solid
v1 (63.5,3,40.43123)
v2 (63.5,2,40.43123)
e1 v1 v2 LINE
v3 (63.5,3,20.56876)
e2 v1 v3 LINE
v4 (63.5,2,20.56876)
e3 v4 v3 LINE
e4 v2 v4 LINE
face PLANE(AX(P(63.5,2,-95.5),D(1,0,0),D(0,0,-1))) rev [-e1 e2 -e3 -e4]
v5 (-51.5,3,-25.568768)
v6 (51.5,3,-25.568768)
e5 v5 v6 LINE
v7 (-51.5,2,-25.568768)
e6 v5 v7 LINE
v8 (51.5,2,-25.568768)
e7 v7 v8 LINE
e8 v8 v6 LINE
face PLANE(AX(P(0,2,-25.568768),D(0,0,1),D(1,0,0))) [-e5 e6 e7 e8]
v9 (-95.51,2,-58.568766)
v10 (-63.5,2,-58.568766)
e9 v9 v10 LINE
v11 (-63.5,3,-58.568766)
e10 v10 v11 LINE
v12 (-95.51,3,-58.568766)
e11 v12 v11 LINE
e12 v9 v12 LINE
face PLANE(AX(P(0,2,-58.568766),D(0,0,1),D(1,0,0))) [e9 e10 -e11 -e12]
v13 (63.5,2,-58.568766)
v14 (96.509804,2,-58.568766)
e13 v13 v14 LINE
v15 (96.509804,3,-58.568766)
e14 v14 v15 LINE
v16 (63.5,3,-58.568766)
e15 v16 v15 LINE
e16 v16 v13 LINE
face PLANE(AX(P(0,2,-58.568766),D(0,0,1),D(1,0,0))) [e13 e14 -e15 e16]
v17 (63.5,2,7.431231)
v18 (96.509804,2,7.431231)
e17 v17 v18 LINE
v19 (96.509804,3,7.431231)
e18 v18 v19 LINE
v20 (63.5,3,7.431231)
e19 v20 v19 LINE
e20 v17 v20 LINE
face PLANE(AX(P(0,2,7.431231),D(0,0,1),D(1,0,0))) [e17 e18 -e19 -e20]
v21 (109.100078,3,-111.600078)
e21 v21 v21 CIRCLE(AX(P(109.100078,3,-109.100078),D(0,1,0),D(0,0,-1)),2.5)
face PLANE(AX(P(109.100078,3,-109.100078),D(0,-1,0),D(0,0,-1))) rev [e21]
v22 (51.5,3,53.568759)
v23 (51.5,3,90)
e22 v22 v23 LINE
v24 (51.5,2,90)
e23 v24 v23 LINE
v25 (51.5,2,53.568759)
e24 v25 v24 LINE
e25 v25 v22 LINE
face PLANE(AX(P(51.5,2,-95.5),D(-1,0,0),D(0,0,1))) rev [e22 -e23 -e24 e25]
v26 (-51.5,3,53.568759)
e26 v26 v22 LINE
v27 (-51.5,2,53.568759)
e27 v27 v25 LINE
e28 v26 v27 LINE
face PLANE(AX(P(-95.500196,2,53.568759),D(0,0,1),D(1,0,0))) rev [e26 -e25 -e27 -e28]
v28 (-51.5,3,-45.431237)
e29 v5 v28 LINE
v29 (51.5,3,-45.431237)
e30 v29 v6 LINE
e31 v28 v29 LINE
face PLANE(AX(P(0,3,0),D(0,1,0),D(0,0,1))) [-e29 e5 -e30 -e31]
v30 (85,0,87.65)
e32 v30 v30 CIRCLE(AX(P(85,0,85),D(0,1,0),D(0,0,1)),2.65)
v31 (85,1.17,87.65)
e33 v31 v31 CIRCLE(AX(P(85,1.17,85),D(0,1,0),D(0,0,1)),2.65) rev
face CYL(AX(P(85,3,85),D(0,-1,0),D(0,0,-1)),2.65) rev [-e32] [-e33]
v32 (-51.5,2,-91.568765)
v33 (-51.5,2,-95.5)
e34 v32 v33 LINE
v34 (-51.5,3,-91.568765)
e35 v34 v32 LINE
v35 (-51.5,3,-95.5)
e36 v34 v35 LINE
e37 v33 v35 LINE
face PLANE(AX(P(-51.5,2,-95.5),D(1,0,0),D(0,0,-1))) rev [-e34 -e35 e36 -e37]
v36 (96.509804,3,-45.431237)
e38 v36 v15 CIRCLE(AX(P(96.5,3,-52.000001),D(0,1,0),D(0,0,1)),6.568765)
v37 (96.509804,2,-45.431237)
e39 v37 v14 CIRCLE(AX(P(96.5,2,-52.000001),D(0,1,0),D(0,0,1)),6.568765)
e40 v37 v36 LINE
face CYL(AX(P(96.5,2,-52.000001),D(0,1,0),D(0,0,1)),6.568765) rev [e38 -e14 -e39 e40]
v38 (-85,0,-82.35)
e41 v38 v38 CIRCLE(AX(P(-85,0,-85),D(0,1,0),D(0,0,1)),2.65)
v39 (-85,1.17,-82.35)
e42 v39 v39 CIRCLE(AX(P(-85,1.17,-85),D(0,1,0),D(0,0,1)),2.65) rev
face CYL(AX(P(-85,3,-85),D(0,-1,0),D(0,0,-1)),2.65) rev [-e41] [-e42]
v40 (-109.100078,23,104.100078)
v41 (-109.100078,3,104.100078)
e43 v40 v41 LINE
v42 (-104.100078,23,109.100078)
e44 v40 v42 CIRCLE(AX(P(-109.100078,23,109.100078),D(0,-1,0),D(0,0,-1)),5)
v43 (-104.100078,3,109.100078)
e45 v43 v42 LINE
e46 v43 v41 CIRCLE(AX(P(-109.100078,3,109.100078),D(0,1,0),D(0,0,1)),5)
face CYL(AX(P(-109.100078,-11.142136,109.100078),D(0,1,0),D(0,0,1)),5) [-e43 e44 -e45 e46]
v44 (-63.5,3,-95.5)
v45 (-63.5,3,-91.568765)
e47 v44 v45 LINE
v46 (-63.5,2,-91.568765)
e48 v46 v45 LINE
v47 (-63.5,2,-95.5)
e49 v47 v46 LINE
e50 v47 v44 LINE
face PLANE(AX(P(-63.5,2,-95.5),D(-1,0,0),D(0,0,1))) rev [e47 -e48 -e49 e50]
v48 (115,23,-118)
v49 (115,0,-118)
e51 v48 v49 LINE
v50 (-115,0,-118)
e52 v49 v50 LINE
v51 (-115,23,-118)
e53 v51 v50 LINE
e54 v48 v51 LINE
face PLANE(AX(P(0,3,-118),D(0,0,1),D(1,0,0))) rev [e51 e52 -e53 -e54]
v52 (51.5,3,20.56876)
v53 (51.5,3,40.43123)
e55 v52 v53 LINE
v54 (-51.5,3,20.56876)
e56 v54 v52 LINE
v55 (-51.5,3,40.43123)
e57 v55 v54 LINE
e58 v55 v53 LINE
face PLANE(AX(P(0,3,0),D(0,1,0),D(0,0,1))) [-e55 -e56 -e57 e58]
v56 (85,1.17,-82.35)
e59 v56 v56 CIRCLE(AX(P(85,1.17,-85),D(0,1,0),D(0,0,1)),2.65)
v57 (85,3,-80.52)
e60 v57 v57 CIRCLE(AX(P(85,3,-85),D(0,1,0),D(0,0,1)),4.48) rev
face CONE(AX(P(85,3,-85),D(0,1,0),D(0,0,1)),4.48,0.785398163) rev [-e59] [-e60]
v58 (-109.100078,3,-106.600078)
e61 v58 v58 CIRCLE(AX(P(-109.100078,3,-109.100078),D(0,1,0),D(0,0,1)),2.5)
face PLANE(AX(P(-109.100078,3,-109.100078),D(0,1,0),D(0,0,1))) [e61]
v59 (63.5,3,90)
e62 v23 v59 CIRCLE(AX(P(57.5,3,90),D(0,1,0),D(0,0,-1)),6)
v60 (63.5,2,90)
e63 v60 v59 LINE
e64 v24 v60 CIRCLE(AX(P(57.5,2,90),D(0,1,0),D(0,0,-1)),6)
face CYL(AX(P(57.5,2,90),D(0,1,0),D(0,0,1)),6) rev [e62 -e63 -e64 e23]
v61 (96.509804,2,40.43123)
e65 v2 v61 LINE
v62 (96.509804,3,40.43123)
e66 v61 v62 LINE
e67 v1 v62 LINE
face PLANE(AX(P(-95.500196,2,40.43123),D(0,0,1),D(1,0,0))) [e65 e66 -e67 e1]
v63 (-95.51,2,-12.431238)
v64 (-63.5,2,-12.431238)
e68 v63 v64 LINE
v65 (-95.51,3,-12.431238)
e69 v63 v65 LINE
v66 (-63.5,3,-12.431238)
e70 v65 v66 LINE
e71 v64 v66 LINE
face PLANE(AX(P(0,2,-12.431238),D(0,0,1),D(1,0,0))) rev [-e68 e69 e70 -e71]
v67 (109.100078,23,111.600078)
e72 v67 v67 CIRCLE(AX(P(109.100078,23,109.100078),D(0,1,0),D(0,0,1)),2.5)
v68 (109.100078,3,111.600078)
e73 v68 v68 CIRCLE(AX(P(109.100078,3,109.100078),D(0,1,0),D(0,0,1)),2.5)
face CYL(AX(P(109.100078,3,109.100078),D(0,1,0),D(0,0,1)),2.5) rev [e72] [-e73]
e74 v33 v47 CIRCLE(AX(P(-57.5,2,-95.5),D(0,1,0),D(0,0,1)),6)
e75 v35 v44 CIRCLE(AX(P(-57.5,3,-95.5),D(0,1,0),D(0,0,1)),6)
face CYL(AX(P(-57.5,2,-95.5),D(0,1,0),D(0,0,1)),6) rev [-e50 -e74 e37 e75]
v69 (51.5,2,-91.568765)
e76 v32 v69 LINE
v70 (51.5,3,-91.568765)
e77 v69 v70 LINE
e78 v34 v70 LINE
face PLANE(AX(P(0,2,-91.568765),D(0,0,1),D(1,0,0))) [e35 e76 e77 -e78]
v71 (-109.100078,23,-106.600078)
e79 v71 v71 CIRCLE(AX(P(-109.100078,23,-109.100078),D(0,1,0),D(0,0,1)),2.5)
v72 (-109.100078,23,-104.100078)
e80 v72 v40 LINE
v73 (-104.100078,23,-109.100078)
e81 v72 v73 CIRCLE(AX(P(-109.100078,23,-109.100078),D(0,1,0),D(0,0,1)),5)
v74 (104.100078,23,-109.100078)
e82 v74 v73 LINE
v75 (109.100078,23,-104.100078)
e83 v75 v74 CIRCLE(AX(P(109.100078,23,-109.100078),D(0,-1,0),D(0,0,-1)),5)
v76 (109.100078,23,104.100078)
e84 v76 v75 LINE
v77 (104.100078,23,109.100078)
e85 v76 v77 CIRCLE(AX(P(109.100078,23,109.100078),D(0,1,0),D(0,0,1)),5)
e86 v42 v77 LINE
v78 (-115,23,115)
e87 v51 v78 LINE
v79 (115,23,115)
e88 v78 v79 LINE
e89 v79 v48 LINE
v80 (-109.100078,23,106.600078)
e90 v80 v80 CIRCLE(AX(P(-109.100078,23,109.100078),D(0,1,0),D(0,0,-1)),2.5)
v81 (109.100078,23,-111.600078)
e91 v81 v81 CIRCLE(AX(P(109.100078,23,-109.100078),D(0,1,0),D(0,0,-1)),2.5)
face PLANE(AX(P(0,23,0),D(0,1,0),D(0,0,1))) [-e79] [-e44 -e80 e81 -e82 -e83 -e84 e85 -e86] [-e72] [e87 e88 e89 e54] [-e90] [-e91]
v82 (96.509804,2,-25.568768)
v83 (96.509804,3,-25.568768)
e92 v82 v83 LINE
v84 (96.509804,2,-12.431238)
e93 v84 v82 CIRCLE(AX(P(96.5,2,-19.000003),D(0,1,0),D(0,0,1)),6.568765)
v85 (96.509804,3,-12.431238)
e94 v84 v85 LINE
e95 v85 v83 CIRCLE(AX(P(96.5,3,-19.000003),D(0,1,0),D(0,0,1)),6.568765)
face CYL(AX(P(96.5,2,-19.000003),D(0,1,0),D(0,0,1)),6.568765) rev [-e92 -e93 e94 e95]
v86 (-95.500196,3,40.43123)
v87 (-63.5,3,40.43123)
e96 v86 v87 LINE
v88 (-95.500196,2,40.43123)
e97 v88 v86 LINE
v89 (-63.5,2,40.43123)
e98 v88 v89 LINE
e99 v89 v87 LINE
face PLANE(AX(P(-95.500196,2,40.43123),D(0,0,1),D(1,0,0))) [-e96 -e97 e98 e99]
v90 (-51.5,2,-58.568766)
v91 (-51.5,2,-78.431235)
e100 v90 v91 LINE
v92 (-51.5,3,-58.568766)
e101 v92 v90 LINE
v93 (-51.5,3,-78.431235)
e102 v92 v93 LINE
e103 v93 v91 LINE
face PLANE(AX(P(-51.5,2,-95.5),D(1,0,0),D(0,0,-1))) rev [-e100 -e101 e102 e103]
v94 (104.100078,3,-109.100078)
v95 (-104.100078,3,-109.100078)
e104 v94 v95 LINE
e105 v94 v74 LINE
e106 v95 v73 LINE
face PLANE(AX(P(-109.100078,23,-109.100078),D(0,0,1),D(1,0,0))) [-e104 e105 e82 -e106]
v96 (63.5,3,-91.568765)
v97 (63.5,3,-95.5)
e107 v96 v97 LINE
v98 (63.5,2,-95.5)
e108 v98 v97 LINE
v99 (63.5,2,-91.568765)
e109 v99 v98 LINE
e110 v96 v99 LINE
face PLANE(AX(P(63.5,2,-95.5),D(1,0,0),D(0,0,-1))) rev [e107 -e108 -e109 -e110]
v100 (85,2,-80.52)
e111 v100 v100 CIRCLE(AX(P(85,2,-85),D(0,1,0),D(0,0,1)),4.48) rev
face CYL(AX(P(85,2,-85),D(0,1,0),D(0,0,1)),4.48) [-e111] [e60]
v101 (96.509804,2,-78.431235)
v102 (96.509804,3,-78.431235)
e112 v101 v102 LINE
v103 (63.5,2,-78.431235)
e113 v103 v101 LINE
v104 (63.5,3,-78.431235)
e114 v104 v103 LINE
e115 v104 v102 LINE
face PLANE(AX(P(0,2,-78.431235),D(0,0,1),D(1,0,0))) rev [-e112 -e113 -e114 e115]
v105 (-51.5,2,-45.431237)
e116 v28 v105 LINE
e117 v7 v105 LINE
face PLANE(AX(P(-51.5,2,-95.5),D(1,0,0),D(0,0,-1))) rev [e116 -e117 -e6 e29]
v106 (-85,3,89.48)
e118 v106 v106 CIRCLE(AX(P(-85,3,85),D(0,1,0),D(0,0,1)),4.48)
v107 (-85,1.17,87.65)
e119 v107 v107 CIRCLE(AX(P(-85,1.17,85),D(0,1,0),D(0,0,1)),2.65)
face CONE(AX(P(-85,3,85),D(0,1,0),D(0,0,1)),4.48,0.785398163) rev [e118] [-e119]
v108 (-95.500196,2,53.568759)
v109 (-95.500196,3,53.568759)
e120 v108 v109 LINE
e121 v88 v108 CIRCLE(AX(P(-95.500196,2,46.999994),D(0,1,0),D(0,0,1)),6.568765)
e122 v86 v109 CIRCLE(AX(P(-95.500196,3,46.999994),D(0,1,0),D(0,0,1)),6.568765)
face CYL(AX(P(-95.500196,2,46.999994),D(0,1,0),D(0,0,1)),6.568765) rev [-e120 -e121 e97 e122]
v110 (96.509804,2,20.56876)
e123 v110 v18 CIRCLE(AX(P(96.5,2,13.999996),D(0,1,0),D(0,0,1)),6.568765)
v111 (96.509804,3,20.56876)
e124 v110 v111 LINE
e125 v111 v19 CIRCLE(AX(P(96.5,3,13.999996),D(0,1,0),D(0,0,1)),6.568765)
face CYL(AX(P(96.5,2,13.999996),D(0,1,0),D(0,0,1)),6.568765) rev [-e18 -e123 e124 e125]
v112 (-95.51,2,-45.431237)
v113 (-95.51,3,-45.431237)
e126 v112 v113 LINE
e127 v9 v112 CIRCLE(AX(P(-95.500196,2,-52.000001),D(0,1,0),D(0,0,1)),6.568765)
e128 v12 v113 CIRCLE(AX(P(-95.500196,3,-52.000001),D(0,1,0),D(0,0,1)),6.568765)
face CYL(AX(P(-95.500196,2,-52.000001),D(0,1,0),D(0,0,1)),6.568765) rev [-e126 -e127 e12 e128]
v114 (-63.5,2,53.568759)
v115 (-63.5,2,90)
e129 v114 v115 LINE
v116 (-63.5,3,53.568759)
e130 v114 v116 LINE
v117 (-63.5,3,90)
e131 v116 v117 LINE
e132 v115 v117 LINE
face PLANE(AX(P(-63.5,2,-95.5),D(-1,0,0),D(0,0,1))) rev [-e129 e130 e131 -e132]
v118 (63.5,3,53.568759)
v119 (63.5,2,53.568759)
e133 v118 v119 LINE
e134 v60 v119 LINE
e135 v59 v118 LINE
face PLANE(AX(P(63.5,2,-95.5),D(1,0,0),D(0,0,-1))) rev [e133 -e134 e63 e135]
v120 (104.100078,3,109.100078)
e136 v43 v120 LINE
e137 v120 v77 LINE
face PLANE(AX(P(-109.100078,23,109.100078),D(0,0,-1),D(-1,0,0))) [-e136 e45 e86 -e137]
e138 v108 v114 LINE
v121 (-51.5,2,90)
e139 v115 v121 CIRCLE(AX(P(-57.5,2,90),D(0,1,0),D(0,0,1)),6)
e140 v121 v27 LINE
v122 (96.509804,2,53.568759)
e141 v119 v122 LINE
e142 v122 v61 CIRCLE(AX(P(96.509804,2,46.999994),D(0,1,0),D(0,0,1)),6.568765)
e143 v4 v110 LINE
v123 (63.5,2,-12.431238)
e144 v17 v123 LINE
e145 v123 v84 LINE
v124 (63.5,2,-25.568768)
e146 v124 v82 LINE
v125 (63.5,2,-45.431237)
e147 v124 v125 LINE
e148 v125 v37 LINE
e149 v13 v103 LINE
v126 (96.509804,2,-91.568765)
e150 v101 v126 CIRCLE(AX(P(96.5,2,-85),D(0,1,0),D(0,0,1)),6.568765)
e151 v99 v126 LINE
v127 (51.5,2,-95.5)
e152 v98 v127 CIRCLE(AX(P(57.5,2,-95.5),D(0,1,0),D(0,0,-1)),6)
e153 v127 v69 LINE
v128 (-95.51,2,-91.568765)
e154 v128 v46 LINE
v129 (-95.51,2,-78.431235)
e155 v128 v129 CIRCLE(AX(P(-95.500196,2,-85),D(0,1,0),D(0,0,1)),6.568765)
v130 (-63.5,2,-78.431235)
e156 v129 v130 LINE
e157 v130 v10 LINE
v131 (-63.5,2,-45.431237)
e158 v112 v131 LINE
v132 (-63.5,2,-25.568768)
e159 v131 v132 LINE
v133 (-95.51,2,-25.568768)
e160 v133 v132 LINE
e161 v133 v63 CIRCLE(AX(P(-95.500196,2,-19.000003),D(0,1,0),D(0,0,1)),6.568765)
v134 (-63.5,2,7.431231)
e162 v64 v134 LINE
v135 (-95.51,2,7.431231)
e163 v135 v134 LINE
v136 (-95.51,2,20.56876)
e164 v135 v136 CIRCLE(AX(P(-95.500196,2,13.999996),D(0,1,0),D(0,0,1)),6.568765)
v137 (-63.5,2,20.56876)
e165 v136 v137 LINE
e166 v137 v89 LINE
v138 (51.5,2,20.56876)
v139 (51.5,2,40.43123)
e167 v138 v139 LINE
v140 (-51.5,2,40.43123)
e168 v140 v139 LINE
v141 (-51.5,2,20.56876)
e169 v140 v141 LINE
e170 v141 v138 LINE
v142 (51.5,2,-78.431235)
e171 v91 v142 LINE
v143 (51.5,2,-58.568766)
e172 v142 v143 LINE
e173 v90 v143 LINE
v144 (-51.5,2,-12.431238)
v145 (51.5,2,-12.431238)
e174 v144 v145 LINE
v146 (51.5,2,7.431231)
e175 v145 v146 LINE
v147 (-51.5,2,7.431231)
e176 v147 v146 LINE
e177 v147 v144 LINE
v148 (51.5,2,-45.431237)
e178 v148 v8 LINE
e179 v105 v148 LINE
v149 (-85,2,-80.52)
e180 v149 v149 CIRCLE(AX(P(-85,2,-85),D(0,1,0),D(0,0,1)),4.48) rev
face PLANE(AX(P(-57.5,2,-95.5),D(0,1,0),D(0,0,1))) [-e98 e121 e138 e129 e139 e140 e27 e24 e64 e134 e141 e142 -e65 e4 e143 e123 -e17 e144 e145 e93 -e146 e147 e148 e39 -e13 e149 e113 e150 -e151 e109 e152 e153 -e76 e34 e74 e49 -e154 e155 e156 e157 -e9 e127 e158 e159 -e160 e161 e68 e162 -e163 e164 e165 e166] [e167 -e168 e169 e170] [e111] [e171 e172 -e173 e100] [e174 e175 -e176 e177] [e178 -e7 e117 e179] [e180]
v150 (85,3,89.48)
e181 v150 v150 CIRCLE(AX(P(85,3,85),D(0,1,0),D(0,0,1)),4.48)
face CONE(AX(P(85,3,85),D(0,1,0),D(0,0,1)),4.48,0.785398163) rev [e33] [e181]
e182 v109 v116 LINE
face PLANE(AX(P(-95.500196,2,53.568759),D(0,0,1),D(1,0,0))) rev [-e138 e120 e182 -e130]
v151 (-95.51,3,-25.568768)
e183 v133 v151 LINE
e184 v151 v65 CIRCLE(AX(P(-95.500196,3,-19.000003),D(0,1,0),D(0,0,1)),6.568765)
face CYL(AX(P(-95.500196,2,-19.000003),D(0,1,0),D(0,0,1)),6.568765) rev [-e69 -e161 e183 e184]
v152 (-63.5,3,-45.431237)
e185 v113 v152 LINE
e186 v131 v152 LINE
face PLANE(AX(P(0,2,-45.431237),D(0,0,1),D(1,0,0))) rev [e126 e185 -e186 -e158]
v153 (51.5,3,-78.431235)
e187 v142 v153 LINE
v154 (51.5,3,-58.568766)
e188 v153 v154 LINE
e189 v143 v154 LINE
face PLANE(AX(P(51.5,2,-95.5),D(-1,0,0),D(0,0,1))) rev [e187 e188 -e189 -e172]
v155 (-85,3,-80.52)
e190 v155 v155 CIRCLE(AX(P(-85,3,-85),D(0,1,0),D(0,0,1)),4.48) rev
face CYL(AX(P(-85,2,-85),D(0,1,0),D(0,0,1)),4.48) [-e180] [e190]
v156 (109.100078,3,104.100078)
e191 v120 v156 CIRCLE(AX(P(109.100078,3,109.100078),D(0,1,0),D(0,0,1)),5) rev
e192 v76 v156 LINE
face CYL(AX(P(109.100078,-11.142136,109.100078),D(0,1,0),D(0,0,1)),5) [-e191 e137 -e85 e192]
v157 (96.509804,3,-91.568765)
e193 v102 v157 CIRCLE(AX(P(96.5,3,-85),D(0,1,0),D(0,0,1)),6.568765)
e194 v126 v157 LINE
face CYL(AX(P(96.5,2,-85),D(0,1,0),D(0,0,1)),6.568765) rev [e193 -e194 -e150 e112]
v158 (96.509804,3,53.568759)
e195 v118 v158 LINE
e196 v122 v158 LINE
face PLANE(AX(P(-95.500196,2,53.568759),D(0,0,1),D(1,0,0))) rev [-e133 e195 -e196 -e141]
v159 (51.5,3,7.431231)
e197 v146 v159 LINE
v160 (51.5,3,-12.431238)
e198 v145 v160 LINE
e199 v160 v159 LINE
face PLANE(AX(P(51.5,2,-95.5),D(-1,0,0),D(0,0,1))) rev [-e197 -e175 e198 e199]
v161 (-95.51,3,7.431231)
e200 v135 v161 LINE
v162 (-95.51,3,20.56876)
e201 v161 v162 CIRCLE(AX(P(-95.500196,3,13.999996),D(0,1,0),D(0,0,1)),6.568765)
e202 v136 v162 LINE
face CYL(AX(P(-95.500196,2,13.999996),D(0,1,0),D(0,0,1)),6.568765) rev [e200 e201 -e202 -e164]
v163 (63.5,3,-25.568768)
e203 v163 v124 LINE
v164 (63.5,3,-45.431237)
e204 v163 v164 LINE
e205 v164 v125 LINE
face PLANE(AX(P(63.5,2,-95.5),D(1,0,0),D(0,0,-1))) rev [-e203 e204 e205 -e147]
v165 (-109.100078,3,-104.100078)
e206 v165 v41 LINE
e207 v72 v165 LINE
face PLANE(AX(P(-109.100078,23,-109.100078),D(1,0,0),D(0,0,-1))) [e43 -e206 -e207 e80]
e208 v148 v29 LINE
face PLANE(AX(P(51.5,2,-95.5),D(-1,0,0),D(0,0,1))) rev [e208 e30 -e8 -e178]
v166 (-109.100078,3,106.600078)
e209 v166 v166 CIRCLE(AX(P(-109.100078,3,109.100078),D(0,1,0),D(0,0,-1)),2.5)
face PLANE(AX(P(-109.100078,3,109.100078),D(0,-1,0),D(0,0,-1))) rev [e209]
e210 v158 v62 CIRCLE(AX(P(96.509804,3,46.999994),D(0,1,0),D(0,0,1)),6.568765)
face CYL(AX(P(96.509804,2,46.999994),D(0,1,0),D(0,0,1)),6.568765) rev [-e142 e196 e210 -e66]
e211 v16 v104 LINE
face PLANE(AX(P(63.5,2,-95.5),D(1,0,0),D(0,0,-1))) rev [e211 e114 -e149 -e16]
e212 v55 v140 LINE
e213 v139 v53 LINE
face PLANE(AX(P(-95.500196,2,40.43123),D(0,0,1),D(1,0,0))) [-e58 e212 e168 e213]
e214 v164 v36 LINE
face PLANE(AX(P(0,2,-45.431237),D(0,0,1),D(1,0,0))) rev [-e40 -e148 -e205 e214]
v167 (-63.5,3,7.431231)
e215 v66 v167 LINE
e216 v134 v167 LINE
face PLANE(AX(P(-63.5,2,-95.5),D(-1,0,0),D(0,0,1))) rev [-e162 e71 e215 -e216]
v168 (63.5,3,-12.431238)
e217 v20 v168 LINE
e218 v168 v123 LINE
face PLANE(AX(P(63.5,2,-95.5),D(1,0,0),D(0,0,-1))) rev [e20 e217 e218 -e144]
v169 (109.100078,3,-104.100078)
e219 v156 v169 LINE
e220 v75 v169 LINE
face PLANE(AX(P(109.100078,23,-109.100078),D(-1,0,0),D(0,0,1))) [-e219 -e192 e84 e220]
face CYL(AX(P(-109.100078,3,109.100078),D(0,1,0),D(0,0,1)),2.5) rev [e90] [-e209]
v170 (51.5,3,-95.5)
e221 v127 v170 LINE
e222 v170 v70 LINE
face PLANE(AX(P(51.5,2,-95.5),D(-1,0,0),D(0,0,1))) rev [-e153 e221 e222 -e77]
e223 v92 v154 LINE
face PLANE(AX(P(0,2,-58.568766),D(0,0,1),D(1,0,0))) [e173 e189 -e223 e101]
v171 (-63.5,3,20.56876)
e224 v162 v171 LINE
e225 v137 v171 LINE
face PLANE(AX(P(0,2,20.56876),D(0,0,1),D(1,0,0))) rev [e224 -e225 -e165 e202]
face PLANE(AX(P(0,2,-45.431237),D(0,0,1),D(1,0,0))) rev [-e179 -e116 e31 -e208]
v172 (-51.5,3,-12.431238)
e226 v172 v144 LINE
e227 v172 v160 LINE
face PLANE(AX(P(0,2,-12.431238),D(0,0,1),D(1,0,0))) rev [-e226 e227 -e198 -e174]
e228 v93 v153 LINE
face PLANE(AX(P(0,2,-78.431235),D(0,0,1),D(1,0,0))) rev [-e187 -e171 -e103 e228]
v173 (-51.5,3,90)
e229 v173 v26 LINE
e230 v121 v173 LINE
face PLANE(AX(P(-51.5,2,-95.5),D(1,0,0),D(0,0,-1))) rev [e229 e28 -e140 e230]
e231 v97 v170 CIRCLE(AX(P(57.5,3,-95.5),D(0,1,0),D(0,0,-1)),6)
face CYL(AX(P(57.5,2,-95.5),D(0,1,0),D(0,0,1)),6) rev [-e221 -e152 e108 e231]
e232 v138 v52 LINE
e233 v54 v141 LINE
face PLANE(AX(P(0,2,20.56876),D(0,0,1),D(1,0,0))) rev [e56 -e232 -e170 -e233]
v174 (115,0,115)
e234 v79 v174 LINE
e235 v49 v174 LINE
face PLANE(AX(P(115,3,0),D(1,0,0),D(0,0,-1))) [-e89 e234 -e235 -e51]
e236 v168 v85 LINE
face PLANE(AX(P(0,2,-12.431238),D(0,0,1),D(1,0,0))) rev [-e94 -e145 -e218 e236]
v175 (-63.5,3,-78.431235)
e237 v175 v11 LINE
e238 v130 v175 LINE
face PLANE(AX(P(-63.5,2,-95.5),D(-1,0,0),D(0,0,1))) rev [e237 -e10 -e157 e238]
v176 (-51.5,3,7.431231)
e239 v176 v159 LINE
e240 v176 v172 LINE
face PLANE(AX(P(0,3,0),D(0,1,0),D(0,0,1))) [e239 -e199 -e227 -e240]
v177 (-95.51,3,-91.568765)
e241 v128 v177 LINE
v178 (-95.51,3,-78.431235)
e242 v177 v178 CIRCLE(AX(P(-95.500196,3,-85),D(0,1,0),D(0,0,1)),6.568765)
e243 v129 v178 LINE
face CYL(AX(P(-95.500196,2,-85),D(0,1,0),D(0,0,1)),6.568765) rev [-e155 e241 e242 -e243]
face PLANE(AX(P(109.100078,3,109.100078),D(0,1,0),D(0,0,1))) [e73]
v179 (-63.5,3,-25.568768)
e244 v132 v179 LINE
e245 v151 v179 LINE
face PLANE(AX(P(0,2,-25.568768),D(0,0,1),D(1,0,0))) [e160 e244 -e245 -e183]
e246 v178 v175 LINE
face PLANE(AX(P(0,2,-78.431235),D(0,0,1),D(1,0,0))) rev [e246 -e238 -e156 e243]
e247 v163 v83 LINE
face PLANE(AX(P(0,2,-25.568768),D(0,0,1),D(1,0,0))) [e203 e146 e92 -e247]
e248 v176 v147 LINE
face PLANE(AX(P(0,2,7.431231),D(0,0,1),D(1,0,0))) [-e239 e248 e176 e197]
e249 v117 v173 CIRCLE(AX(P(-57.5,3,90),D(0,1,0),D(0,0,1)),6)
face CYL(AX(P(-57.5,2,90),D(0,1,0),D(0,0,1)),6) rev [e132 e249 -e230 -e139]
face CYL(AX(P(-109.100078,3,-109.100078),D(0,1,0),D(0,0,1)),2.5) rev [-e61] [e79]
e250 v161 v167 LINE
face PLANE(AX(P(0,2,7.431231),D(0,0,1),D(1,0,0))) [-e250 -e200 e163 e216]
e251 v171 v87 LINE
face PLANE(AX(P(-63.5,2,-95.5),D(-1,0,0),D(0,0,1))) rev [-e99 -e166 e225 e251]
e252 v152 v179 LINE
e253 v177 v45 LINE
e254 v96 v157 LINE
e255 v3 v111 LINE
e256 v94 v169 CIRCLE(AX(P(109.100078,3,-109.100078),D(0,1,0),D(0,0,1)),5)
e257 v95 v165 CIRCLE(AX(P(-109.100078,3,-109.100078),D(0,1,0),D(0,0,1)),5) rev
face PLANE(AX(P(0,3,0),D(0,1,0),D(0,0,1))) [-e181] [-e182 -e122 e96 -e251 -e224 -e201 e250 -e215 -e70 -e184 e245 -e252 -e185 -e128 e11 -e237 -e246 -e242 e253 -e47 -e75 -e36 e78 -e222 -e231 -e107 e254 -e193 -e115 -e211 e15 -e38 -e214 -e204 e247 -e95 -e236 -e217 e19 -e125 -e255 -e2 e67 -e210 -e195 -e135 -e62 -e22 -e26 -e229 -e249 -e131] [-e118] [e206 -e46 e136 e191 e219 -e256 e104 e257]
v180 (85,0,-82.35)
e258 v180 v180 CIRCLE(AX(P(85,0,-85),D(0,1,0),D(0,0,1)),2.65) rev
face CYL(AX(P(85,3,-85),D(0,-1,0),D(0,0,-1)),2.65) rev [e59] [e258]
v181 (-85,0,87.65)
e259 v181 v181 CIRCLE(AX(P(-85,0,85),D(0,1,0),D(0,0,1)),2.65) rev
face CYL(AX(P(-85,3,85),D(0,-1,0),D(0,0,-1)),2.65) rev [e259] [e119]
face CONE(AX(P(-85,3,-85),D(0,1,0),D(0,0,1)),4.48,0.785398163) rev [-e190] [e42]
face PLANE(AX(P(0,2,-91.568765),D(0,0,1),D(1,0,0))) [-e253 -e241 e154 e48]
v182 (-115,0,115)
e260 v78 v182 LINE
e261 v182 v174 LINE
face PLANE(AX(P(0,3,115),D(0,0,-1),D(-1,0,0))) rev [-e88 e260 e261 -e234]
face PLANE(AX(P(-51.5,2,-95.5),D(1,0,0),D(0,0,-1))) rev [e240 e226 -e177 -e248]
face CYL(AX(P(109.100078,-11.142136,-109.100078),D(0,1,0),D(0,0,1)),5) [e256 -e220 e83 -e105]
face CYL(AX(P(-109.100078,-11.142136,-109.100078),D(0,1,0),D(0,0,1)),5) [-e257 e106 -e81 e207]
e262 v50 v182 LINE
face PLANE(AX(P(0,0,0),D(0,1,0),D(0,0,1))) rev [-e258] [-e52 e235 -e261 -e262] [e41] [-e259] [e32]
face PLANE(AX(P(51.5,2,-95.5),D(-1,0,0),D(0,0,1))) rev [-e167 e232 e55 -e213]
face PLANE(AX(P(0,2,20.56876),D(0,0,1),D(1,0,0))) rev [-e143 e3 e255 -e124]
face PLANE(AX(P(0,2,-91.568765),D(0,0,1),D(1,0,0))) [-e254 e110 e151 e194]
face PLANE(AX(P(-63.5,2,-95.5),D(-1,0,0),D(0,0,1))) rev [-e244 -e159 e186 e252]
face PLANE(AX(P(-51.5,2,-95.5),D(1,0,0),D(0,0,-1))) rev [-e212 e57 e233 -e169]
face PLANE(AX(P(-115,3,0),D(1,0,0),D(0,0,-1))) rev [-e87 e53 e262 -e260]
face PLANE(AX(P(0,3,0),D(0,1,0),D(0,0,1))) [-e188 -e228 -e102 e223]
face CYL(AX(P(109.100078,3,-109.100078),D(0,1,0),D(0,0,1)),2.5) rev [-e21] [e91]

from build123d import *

# Parameters (mm, degrees)
CROQUIS1_W                                   = 230
CROQUIS1_H                                   = 233
CROQUIS1_R                                   = 2.65
SALIENTE_EXTRUIR1_DEPTH                      = 3
REFRENTADO_PARA_TORNILLO_TAP_N_CON_C_2_COUNT = 2
REFRENTADO_PARA_TORNILLO_TAP_N_CON_C_2_PITCH = 170
REFRENTADO_PARA_TORNILLO_TAP_N_CON_C_3_COUNT = 2
REFRENTADO_PARA_TORNILLO_TAP_N_CON_C_3_PITCH = 170
REFRENTADO_PARA_TORNILLO_TAP_N_CON_C_4_COUNT = 2
REFRENTADO_PARA_TORNILLO_TAP_N_CON_C_4_PITCH = 240.416305603
CROQUIS4_W                                   = 218.200156166
CROQUIS4_H                                   = 218.200156166
SALIENTE_EXTRUIR2_DEPTH                      = 20
CROQUIS5_R                                   = 5
SALIENTE_EXTRUIR3_DEPTH                      = 20
CROQUIS6_R                                   = 2.5
CORTAR_EXTRUIR1_DEPTH                        = 20
CORTAR_EXTRUIR2_DEPTH                        = 1
CORTAR_EXTRUIR3_START                        = -1
CORTAR_EXTRUIR3_OUTLINE_R                    = 4.48
CORTAR_EXTRUIR3_OUTLINE_W                    = 103
CORTAR_EXTRUIR3_OUTLINE_H                    = 13.137529202
CORTAR_EXTRUIR3_OUTLINE_H_2                  = 13.137529203
CORTAR_EXTRUIR3_DEPTH                        = 1


# Read off the part's stored shape, not the designer's step: Cortar-Extruir3
with BuildPart() as part:
    # Croquis1 → Saliente-Extruir1 (new body)
    with BuildSketch(Plane(origin=(0, 0, 0), x_dir=(1, 0, 0), z_dir=(0, 1, 0))):
        with Locations((0, 1.5)):
            Rectangle(CROQUIS1_W, CROQUIS1_H)
        with Locations(Location((-85, 85, 0), (0, 0, 270))):
            Circle(CROQUIS1_R, mode=Mode.SUBTRACT)
        with Locations(Location((-85, -85, 0), (0, 0, 270))):
            Circle(CROQUIS1_R, mode=Mode.SUBTRACT)
        with Locations(Location((85, -85, 0), (0, 0, 270))):
            Circle(CROQUIS1_R, mode=Mode.SUBTRACT)
        with Locations(Location((85, 85, 0), (0, 0, 270))):
            Circle(CROQUIS1_R, mode=Mode.SUBTRACT)
    extrude(amount=SALIENTE_EXTRUIR1_DEPTH)

    # Croquis3 → Refrentado para tornillo tapón con cabeza plana de clavija de M41 (revolve, cut)
    with BuildSketch(Plane(origin=(-85, 3, -85), x_dir=(0, 0, 1), z_dir=(1, 0, 0))):
        Polygon((0, 0), (0, 3), (2.25, 3), (2.25, 2.23), (4.48, 0), align=None)
    refrentado_para_tornillo_tap_n_con_cabez = revolve(axis=Axis((-85, 9.35, -85), (0, -1, 0)), mode=Mode.SUBTRACT)

    # Refrentado para tornillo tap_n con c 2: Refrentado para tornillo tapón con cabeza plana de clavija de M41 ×2
    with Locations(*[(i * REFRENTADO_PARA_TORNILLO_TAP_N_CON_C_2_PITCH, 0, 0) for i in range(1, REFRENTADO_PARA_TORNILLO_TAP_N_CON_C_2_COUNT)]):
        add(refrentado_para_tornillo_tap_n_con_cabez, mode=Mode.SUBTRACT)

    # Refrentado para tornillo tap_n con c 3: Refrentado para tornillo tapón con cabeza plana de clavija de M41 ×2
    with Locations(*[(0, 0, i * REFRENTADO_PARA_TORNILLO_TAP_N_CON_C_3_PITCH) for i in range(1, REFRENTADO_PARA_TORNILLO_TAP_N_CON_C_3_COUNT)]):
        add(refrentado_para_tornillo_tap_n_con_cabez, mode=Mode.SUBTRACT)

    # Refrentado para tornillo tap_n con c 4: Refrentado para tornillo tapón con cabeza plana de clavija de M41 ×2
    with Locations(*[Vector(0.7071067811865476, 0, 0.7071067811865475) * (i * REFRENTADO_PARA_TORNILLO_TAP_N_CON_C_4_PITCH) for i in range(1, REFRENTADO_PARA_TORNILLO_TAP_N_CON_C_4_COUNT)]):
        add(refrentado_para_tornillo_tap_n_con_cabez, mode=Mode.SUBTRACT)

    # Croquis4 → Saliente-Extruir2 (add)
    with BuildSketch(Plane(origin=(0, 3, 0), x_dir=(1, 0, 0), z_dir=(0, 1, 0))):
        Polygon((-115, 115), (-115, -115), (115, -115), (115, 115), (115, 118), (-115, 118), align=None)
        Rectangle(CROQUIS4_W, CROQUIS4_H, mode=Mode.SUBTRACT)
    extrude(amount=SALIENTE_EXTRUIR2_DEPTH)

    # Croquis5 → Saliente-Extruir3 (add)
    with BuildSketch(Plane(origin=(0, 23, 0), x_dir=(1, 0, 0), z_dir=(0, 1, 0))):
        with Locations((-109.100078083, 109.100078083)):
            Circle(CROQUIS5_R)
        with Locations((109.100078083, 109.100078083)):
            Circle(CROQUIS5_R)
        with Locations((109.100078083, -109.100078083)):
            Circle(CROQUIS5_R)
        with Locations((-109.100078083, -109.100078083)):
            Circle(CROQUIS5_R)
    extrude(amount=-SALIENTE_EXTRUIR3_DEPTH)

    # Croquis6 → Cortar-Extruir1 (cut)
    with BuildSketch(Plane(origin=(0, 23, 0), x_dir=(1, 0, 0), z_dir=(0, 1, 0))):
        with Locations(Location((-109.100078083, 109.100078083, 0), (0, 0, 270))):
            Circle(CROQUIS6_R)
        with Locations(Location((109.100078083, 109.100078083, 0), (0, 0, 90))):
            Circle(CROQUIS6_R)
        with Locations(Location((109.100078083, -109.100078083, 0), (0, 0, 270))):
            Circle(CROQUIS6_R)
        with Locations(Location((-109.100078083, -109.100078083, 0), (0, 0, 90))):
            Circle(CROQUIS6_R)
    extrude(amount=-CORTAR_EXTRUIR1_DEPTH, mode=Mode.SUBTRACT)

    # Croquis8 → Cortar-Extruir2 (cut)
    with BuildSketch(Plane(origin=(0, 3, 0), x_dir=(1, 0, 0), z_dir=(0, 1, 0))):
        with BuildLine():
            Line((-51.5, 95.5), (-51.5, -90))
            ThreePointArc((-51.5, -90), (-57.5, -96), (-63.5, -90))
            Line((-63.5, -90), (-63.5, 95.5))
            ThreePointArc((-63.5, 95.5), (-57.5, 101.5), (-51.5, 95.5))
        make_face()
        with BuildLine():
            Line((51.5, 95.5), (51.5, -90))
            ThreePointArc((51.5, -90), (57.5, -96), (63.5, -90))
            Line((63.5, -90), (63.5, 95.5))
            ThreePointArc((63.5, 95.5), (57.5, 101.5), (51.5, 95.5))
        make_face()
    extrude(amount=-CORTAR_EXTRUIR2_DEPTH, mode=Mode.SUBTRACT)

    # Cortar-Extruir3 outline → Cortar-Extruir3 (cut)
    # profile 1 of 15: a face of its own
    with BuildSketch(Plane(origin=(0, 3, 0), x_dir=(1, 0, 0), z_dir=(0, 1, 0)).offset(CORTAR_EXTRUIR3_START)):
        with BuildLine():
            ThreePointArc((-95.500196079, -40.431229574), (-102.06896068, -46.999994175), (-95.500196079, -53.568758776))
            Line((-95.500196079, -53.568758776), (-63.5, -53.568758776))
            Line((-63.5, -53.568758776), (-63.5, -40.431229574))
            Line((-63.5, -40.431229574), (-95.500196079, -40.431229574))
        make_face()
    # profile 2 of 15: a face of its own
    with BuildSketch(Plane(origin=(0, 3, 0), x_dir=(1, 0, 0), z_dir=(0, 1, 0)).offset(CORTAR_EXTRUIR3_START)):
        with BuildLine():
            Line((-95.509999989, 78.431242715), (-63.5, 78.431235399))
            Line((-63.5, 78.431235399), (-63.5, 91.568764601))
            Line((-63.5, 91.568764601), (-95.509999989, 91.568757285))
            ThreePointArc((-95.509999989, 91.568757285), (-102.06896068, 85), (-95.509999989, 78.431242715))
        make_face()
        with Locations((-85, 85)):
            Circle(CORTAR_EXTRUIR3_OUTLINE_R, mode=Mode.SUBTRACT)
    # profile 3 of 15: a face of its own
    with BuildSketch(Plane(origin=(0, 3, 0), x_dir=(1, 0, 0), z_dir=(0, 1, 0)).offset(CORTAR_EXTRUIR3_START)):
        with BuildLine():
            Line((-95.509999989, 45.431244171), (-63.5, 45.431236855))
            Line((-63.5, 45.431236855), (-63.5, 58.568766057))
            Line((-63.5, 58.568766057), (-95.509999989, 58.568758741))
            ThreePointArc((-95.509999989, 58.568758741), (-102.06896068, 52.000001456), (-95.509999989, 45.431244171))
        make_face()
    # profile 4 of 15: a face of its own
    with BuildSketch(Plane(origin=(0, 3, 0), x_dir=(1, 0, 0), z_dir=(0, 1, 0)).offset(CORTAR_EXTRUIR3_START)):
        with BuildLine():
            Line((-95.509999989, 12.431245628), (-63.5, 12.431238311))
            Line((-63.5, 12.431238311), (-63.5, 25.568767514))
            Line((-63.5, 25.568767514), (-95.509999989, 25.568760198))
            ThreePointArc((-95.509999989, 25.568760198), (-102.06896068, 19.000002913), (-95.509999989, 12.431245628))
        make_face()
    # profile 5 of 15: a face of its own
    with BuildSketch(Plane(origin=(0, 3, 0), x_dir=(1, 0, 0), z_dir=(0, 1, 0)).offset(CORTAR_EXTRUIR3_START)):
        with BuildLine():
            Line((-95.509999989, -20.568752916), (-63.5, -20.568760232))
            Line((-63.5, -20.568760232), (-63.5, -7.43123103))
            Line((-63.5, -7.43123103), (-95.509999989, -7.431238346))
            ThreePointArc((-95.509999989, -7.431238346), (-102.06896068, -13.999995631), (-95.509999989, -20.568752916))
        make_face()
    # profile 6 of 15: a face of its own
    with BuildSketch(Plane(origin=(0, 3, 0), x_dir=(1, 0, 0), z_dir=(0, 1, 0)).offset(CORTAR_EXTRUIR3_START)):
        with Locations((0, -46.999994175)):
            Rectangle(CORTAR_EXTRUIR3_OUTLINE_W, CORTAR_EXTRUIR3_OUTLINE_H)
    # profile 7 of 15: a face of its own
    with BuildSketch(Plane(origin=(0, 3, 0), x_dir=(1, 0, 0), z_dir=(0, 1, 0)).offset(CORTAR_EXTRUIR3_START)):
        with Locations((0, -13.999995631)):
            Rectangle(CORTAR_EXTRUIR3_OUTLINE_W, CORTAR_EXTRUIR3_OUTLINE_H)
    # profile 8 of 15: a face of its own
    with BuildSketch(Plane(origin=(0, 3, 0), x_dir=(1, 0, 0), z_dir=(0, 1, 0)).offset(CORTAR_EXTRUIR3_START)):
        with Locations((0, 19.000002913)):
            Rectangle(CORTAR_EXTRUIR3_OUTLINE_W, CORTAR_EXTRUIR3_OUTLINE_H_2)
    # profile 9 of 15: a face of its own
    with BuildSketch(Plane(origin=(0, 3, 0), x_dir=(1, 0, 0), z_dir=(0, 1, 0)).offset(CORTAR_EXTRUIR3_START)):
        with Locations((0, 52.000001456)):
            Rectangle(CORTAR_EXTRUIR3_OUTLINE_W, CORTAR_EXTRUIR3_OUTLINE_H)
    # profile 10 of 15: a face of its own
    with BuildSketch(Plane(origin=(0, 3, 0), x_dir=(1, 0, 0), z_dir=(0, 1, 0)).offset(CORTAR_EXTRUIR3_START)):
        with Locations((0, 85)):
            Rectangle(CORTAR_EXTRUIR3_OUTLINE_W, CORTAR_EXTRUIR3_OUTLINE_H)
    # profile 11 of 15: a face of its own
    with BuildSketch(Plane(origin=(0, 3, 0), x_dir=(1, 0, 0), z_dir=(0, 1, 0)).offset(CORTAR_EXTRUIR3_START)):
        with BuildLine():
            Line((63.5, -40.431229574), (63.5, -53.568758776))
            Line((63.5, -53.568758776), (96.509803921, -53.568758776))
            ThreePointArc((96.509803921, -53.568758776), (103.078568522, -46.999994175), (96.509803921, -40.431229574))
            Line((96.509803921, -40.431229574), (63.5, -40.431229574))
        make_face()
    # profile 12 of 15: a face of its own
    with BuildSketch(Plane(origin=(0, 3, 0), x_dir=(1, 0, 0), z_dir=(0, 1, 0)).offset(CORTAR_EXTRUIR3_START)):
        with BuildLine():
            Line((63.5, 91.568764601), (63.5, 78.431235399))
            Line((63.5, 78.431235399), (96.50980391, 78.431242715))
            ThreePointArc((96.50980391, 78.431242715), (103.068764601, 85), (96.50980391, 91.568757285))
            Line((96.50980391, 91.568757285), (63.5, 91.568764601))
        make_face()
        with Locations((85, 85)):
            Circle(CORTAR_EXTRUIR3_OUTLINE_R, mode=Mode.SUBTRACT)
    # profile 13 of 15: a face of its own
    with BuildSketch(Plane(origin=(0, 3, 0), x_dir=(1, 0, 0), z_dir=(0, 1, 0)).offset(CORTAR_EXTRUIR3_START)):
        with BuildLine():
            Line((63.5, 58.568766057), (63.5, 45.431236855))
            Line((63.5, 45.431236855), (96.50980391, 45.431244171))
            ThreePointArc((96.50980391, 45.431244171), (103.068764601, 52.000001456), (96.50980391, 58.568758741))
            Line((96.50980391, 58.568758741), (63.5, 58.568766057))
        make_face()
    # profile 14 of 15: a face of its own
    with BuildSketch(Plane(origin=(0, 3, 0), x_dir=(1, 0, 0), z_dir=(0, 1, 0)).offset(CORTAR_EXTRUIR3_START)):
        with BuildLine():
            Line((63.5, 25.568767514), (63.5, 12.431238311))
            Line((63.5, 12.431238311), (96.50980391, 12.431245628))
            ThreePointArc((96.50980391, 12.431245628), (103.068764601, 19.000002913), (96.50980391, 25.568760198))
            Line((96.50980391, 25.568760198), (63.5, 25.568767514))
        make_face()
    # profile 15 of 15: a face of its own
    with BuildSketch(Plane(origin=(0, 3, 0), x_dir=(1, 0, 0), z_dir=(0, 1, 0)).offset(CORTAR_EXTRUIR3_START)):
        with BuildLine():
            Line((63.5, -7.43123103), (63.5, -20.568760232))
            Line((63.5, -20.568760232), (96.50980391, -20.568752916))
            ThreePointArc((96.50980391, -20.568752916), (103.068764601, -13.999995631), (96.50980391, -7.431238346))
            Line((96.50980391, -7.431238346), (63.5, -7.43123103))
        make_face()
    extrude(amount=CORTAR_EXTRUIR3_DEPTH, mode=Mode.SUBTRACT)


solid = part.part
